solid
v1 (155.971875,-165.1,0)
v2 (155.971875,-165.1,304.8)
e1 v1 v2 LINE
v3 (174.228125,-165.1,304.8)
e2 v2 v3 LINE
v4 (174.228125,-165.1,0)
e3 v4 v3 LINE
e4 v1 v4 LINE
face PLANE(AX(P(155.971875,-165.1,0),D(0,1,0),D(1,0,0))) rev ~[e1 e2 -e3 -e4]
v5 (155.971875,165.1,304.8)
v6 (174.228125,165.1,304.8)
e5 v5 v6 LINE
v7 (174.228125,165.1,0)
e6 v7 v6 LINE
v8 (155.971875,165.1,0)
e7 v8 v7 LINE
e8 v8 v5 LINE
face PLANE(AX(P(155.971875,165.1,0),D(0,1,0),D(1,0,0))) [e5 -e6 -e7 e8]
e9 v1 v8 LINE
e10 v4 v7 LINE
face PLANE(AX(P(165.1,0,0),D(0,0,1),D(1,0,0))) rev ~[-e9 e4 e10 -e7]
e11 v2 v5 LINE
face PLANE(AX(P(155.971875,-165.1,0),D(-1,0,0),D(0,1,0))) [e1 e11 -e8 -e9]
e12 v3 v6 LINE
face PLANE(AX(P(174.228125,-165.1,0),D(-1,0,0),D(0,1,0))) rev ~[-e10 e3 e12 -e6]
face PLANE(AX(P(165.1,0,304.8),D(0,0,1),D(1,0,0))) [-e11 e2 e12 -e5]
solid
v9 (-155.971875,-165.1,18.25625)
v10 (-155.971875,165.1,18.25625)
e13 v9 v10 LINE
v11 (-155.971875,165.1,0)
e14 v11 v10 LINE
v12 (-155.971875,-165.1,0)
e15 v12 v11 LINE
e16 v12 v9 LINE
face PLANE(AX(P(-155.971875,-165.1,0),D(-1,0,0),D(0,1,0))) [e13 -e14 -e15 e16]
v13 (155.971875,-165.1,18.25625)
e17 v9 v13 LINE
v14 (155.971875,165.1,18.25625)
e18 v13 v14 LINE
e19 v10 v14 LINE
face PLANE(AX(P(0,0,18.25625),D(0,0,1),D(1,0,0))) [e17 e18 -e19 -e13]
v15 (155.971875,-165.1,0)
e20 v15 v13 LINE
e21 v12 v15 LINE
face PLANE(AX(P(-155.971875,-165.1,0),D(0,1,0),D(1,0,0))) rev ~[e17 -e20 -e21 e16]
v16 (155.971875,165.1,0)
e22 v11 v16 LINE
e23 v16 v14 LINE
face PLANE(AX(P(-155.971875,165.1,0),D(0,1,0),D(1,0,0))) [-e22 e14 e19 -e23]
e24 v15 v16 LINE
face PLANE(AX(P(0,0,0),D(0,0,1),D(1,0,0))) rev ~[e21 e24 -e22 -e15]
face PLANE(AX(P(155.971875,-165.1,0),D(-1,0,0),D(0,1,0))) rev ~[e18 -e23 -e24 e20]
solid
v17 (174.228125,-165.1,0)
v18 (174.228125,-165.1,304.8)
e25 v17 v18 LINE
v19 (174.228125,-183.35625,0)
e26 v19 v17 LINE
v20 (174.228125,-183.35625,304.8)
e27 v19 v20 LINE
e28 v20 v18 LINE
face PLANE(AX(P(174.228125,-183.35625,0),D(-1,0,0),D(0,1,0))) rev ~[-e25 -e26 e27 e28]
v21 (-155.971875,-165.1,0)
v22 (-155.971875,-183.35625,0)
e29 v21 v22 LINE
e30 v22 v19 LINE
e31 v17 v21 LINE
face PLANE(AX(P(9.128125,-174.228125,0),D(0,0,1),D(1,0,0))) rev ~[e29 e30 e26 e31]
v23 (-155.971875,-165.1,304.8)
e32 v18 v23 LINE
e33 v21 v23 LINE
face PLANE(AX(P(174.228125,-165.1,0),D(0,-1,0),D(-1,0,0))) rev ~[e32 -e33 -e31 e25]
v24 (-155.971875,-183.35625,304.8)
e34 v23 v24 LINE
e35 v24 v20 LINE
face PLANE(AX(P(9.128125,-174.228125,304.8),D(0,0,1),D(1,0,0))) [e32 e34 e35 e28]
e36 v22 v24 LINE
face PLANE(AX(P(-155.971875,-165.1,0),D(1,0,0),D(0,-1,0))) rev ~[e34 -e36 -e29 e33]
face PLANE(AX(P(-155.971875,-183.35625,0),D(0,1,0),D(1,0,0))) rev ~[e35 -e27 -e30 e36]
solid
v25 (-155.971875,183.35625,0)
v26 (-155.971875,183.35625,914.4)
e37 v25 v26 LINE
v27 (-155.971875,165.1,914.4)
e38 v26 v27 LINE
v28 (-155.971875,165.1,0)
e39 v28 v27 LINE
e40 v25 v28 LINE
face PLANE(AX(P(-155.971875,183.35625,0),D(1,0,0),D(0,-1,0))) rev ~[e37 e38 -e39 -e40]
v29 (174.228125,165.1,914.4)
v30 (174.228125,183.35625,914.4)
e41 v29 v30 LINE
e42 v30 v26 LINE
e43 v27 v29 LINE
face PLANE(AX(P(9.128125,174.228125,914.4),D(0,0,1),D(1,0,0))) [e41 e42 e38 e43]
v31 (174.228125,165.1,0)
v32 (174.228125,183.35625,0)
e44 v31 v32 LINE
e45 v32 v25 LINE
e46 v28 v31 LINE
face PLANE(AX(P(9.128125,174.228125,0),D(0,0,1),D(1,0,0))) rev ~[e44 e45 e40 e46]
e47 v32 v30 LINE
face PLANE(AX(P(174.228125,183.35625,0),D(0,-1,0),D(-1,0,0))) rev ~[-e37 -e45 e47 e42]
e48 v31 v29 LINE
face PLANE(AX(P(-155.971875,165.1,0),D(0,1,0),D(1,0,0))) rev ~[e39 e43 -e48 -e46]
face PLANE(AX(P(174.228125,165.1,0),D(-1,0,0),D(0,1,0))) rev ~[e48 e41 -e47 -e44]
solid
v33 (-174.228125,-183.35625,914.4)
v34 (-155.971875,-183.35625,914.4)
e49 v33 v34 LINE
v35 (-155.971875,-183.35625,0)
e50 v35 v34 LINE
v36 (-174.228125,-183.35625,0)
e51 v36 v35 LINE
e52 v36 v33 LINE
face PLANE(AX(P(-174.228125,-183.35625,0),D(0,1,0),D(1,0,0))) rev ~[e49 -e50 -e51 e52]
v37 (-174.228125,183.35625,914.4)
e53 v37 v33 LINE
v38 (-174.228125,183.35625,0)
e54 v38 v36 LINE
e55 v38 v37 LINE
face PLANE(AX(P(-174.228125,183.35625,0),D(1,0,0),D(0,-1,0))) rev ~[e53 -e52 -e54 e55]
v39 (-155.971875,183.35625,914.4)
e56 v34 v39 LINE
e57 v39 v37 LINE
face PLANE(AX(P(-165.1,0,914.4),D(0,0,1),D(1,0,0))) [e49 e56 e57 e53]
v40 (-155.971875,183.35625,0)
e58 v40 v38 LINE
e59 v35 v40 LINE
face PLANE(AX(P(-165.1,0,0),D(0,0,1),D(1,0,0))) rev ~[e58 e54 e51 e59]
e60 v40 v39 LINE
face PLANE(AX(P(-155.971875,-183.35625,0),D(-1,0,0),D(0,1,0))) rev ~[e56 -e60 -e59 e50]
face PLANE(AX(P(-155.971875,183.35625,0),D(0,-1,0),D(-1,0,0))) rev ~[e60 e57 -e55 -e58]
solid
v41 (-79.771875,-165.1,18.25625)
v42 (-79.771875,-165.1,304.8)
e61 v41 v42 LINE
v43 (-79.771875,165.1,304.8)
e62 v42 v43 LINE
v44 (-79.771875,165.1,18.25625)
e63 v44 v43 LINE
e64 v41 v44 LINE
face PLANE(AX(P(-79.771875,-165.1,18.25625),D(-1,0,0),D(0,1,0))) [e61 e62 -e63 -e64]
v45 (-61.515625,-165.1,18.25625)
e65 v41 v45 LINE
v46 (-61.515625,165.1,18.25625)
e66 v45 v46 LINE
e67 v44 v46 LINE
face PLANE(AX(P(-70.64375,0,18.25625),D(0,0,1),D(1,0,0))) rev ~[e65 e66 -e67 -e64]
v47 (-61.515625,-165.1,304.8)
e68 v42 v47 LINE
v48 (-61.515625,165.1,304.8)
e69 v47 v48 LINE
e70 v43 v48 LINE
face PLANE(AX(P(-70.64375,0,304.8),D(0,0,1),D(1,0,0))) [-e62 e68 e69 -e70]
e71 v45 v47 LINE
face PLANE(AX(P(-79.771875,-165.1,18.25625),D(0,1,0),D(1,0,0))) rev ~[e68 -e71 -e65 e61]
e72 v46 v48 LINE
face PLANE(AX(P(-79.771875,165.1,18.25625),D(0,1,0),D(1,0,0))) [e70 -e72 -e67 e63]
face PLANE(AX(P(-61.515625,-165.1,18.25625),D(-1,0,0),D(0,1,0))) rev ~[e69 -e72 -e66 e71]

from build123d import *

# Parameters (mm, degrees)
F4_W      = 311.94375
F4_H      = 330.2
F5_DEPTH  = 18.25625
F6_DEPTH  = 914.4
F7_DEPTH  = 914.4
F8_DEPTH  = 304.8
F3_W      = 18.25625
F3_H      = 330.2
F9_DEPTH  = 304.8
F10_W     = 18.25625
F10_H     = 330.2
F11_DEPTH = 286.54375


# Not quite as in the source:
# - a length typed as a fraction of an inch, garbled in the dataset ("3 / 203.2 mm" for 3/8 in), is restored


with BuildPart() as f5:
    # F4 (on Top) → F5 (new body)
    with BuildSketch(Plane.XY):
        Rectangle(F4_W, F4_H)
    extrude(amount=F5_DEPTH)


with BuildPart() as f6:
    # F3 (on Top) → F6 (new body)
    with BuildSketch(Plane.XY):
        Polygon((-174.228125, -183.35625), (-155.971875, -183.35625), (-155.971875, -165.1), (-155.971875, 165.1), (-155.971875, 183.35625), (-174.228125, 183.35625), align=None)
    extrude(amount=F6_DEPTH)


with BuildPart() as f7:
    # F3 (on Top) → F7 (new body)
    with BuildSketch(Plane.XY):
        Polygon((155.971875, 165.1), (174.228125, 165.1), (174.228125, 183.35625), (-155.971875, 183.35625), (-155.971875, 165.1), align=None)
    extrude(amount=F7_DEPTH)


with BuildPart() as f8:
    # F3 (on Top) → F8 (new body)
    with BuildSketch(Plane.XY):
        Polygon((-155.971875, -183.35625), (174.228125, -183.35625), (174.228125, -165.1), (155.971875, -165.1), (-155.971875, -165.1), align=None)
    extrude(amount=F8_DEPTH)


with BuildPart() as f9:
    # F3 (on Top) → F9 (new body)
    with BuildSketch(Plane.XY):
        with Locations((165.1, 0)):
            Rectangle(F3_W, F3_H)
    extrude(amount=F9_DEPTH)


with BuildPart() as f11:
    # F10 (on face) → F11 (new body, through all)
    with BuildSketch(Plane.XY.offset(18.25625)):
        with Locations((-70.64375, 0)):
            Rectangle(F10_W, F10_H)
    extrude(amount=F11_DEPTH)


solid = Compound([f5.part, f6.part, f7.part, f8.part, f9.part, f11.part])
